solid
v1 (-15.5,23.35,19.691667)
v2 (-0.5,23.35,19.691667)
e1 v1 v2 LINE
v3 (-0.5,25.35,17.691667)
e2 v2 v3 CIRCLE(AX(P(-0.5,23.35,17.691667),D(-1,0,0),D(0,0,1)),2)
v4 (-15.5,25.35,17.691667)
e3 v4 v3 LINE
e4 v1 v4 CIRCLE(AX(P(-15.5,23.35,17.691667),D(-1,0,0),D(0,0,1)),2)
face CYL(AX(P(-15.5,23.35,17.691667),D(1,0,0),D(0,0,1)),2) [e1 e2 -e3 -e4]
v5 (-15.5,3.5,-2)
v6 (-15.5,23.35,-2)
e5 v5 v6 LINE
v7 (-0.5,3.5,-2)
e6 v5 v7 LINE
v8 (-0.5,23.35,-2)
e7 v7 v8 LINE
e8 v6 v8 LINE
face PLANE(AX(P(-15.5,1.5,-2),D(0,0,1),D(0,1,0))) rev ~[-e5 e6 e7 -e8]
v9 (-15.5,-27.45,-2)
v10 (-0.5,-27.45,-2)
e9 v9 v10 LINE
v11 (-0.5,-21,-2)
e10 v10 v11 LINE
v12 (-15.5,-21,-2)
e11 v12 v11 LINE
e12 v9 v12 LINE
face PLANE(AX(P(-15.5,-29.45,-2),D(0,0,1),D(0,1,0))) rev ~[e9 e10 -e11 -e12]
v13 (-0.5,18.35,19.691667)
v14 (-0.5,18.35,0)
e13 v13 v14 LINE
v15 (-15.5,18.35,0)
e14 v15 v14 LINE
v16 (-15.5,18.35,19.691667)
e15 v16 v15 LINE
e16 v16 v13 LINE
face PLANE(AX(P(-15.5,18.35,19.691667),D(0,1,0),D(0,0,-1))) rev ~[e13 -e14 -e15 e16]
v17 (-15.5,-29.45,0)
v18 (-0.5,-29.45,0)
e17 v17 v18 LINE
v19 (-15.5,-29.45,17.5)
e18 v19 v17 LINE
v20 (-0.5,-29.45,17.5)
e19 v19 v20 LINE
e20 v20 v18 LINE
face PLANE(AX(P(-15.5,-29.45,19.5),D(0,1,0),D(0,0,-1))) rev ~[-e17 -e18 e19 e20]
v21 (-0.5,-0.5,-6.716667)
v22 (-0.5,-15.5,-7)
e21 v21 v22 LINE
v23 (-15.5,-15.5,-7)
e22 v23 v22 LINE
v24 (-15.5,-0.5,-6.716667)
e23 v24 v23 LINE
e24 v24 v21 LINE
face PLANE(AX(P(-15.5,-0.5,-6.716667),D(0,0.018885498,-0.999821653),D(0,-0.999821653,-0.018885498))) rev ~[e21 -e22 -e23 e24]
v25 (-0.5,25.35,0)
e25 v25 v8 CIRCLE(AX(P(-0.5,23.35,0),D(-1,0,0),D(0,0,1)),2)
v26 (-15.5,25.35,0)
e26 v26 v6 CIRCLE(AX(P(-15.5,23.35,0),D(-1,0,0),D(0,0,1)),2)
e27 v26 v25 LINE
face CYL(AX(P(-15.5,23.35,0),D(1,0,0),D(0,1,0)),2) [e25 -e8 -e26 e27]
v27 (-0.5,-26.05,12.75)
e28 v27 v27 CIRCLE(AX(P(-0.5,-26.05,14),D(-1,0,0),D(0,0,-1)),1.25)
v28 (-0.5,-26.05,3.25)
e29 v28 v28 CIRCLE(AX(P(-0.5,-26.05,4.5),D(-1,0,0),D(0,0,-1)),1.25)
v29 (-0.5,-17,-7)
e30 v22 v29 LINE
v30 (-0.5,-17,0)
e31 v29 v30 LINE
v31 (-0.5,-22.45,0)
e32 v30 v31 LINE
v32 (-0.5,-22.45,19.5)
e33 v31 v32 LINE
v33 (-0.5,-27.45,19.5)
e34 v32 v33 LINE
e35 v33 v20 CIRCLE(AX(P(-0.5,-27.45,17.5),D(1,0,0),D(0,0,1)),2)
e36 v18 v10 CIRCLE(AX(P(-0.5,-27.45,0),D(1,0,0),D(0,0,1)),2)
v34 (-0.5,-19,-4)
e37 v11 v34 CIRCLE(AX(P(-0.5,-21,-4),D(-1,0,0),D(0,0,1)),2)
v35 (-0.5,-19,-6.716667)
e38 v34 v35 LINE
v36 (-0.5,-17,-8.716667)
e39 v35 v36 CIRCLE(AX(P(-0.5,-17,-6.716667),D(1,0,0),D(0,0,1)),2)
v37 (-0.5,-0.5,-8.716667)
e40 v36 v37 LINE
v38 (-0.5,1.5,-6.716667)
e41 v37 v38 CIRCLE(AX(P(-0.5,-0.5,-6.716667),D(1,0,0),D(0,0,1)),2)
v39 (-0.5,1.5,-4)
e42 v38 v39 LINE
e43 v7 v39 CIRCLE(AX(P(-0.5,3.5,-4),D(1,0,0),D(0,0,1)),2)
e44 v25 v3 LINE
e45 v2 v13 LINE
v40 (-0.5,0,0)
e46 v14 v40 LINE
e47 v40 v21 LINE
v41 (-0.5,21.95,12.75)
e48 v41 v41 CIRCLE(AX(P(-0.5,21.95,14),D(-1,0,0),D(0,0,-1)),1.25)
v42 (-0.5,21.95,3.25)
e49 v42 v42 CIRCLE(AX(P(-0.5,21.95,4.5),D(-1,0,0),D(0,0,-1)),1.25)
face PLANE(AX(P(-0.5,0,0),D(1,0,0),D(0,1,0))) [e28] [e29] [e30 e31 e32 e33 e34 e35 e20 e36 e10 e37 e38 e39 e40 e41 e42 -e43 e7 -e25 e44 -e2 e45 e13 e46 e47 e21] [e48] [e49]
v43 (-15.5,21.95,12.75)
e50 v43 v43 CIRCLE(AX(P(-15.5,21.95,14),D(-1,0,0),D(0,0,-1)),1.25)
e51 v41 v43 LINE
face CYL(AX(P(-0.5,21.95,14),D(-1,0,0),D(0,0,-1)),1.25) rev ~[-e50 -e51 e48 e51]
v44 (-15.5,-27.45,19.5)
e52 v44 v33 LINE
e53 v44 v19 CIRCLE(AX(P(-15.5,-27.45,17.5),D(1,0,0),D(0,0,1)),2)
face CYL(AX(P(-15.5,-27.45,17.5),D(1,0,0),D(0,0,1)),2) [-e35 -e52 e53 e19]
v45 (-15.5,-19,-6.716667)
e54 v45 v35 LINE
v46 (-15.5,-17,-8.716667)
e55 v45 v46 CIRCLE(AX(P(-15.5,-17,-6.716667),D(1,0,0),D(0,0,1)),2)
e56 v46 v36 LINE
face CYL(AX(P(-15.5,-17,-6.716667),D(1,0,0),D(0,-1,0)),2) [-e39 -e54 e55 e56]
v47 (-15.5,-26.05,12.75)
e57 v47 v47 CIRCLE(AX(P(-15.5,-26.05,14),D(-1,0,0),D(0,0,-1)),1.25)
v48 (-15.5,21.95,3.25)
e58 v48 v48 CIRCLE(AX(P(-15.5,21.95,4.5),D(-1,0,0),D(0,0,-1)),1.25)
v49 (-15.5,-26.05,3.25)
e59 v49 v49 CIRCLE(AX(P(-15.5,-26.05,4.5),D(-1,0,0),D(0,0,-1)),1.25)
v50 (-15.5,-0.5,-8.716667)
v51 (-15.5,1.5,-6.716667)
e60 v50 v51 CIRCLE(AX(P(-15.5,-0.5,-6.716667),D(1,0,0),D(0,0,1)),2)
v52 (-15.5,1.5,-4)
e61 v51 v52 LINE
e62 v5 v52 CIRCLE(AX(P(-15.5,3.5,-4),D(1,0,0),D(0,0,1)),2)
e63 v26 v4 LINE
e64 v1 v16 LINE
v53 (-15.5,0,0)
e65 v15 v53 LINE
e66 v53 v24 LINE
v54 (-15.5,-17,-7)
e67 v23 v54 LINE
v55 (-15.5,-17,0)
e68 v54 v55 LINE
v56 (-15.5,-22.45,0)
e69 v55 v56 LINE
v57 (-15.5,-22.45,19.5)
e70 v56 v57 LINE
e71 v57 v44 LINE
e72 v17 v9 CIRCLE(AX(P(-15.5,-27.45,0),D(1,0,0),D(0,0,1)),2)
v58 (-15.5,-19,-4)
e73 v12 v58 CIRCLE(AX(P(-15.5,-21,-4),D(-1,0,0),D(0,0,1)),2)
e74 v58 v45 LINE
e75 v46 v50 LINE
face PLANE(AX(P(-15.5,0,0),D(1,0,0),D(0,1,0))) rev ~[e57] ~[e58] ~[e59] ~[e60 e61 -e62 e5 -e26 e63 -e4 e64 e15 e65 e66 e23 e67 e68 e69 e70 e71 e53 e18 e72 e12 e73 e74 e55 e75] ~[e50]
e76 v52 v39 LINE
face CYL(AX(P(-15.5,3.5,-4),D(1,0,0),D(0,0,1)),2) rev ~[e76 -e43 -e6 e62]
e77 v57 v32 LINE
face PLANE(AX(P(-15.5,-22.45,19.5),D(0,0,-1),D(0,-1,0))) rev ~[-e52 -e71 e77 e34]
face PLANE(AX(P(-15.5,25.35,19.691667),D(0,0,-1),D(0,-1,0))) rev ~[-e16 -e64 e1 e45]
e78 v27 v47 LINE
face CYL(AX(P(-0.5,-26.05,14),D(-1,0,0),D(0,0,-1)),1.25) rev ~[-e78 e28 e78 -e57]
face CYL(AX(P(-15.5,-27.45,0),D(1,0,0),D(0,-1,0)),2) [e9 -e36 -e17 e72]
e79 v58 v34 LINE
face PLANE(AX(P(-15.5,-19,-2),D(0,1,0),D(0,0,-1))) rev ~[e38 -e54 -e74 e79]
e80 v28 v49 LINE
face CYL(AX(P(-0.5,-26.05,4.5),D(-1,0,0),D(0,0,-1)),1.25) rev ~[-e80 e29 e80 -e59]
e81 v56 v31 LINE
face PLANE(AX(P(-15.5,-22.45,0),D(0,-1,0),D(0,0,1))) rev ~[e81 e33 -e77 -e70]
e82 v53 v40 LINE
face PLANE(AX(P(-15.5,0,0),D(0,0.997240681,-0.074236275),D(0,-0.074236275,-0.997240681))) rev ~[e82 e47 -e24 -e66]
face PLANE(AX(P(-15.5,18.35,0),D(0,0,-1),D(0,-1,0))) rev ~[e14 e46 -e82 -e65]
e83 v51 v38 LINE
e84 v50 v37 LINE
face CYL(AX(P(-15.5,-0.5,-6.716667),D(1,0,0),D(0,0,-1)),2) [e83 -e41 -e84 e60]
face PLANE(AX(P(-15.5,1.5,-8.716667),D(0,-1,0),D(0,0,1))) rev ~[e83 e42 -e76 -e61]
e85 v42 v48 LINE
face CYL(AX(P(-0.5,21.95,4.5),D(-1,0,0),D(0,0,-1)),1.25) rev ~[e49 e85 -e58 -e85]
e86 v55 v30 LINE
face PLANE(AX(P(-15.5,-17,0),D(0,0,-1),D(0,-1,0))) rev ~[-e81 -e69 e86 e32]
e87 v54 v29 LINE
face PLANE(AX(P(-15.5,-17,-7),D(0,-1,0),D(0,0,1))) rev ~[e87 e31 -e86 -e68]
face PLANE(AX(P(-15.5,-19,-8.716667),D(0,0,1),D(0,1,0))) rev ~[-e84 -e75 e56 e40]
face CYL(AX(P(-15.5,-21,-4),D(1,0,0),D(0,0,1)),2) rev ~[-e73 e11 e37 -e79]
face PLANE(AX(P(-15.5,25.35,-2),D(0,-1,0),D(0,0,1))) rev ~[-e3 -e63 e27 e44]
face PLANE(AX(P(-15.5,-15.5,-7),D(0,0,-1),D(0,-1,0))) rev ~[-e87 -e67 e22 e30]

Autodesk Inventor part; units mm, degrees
ref_plane "XZ Plane" through (0, 0, 0) normal (0, 1, 0) x (-1, 0, 0)
ref_plane "XY Plane" through (0, 0, 0) normal (0, 0, 1) x (1, 0, 0)
ref_plane "Work Plane1" through (-15.5, 0, 0) normal (1, 0, 0) x (0, 1, 0)
sketch "Sketch1" plane through (-15.5, 0, 0) normal (1, 0, 0) x (0, 1, 0)
  line L0 (-0.5, 0) -> (-0.5, -6.716667)
  line L1 (-0.5, -6.716667) -> (-15.5, -6.716667)
  line L2 (-17, -7) -> (-15.5, -7)
  line L3 (-17, 0) -> (-17, -7)
  line L4 (-17, 0) -> (-22.45, 0)
  line L5 (-22.45, 0) -> (-22.45, 19.5)
  line L6 (-22.45, 19.5) -> (-29.45, 19.5)
  line L7 (-29.45, 19.5) -> (-29.45, -2)
  line L8 (-29.45, -2) -> (-19, -2)
  line L9 (-19, -2) -> (-19, -8.716667)
  line L10 (-19, -8.716667) -> (1.5, -8.716667)
  line L11 (-17, -7) -> (-0.5, -7) construction
  line L12 (-9.247706, -7) -> (-9.247706, -16.201099) construction
  line L13 (1.5, -8.716667) -> (1.5, -2)
  line L14 (1.5, -2) -> (25.35, -2)
  line L15 (25.35, -2) -> (25.35, 19.691667)
  line L16 (25.35, 19.691667) -> (18.35, 19.691667)
  line L17 (18.35, 19.691667) -> (18.35, 0)
  line L18 (18.35, 0) -> (0, 0)
  line L19 (-14.45, -1.808333) -> (-14.45, -5.115) construction
  dimension "d1" = 19.5
  dimension "d2" = 2
  dimension "d3" = 2
  dimension "d4" = 2
  dimension "d5" = 7
  dimension "d6" = 7
  dimension "d7" = 2
  dimension "d8" = 8
  dimension "d9" = 40.8
sketch "Sketch1 outline for Extrusion1" plane through (-15.5, 0, 0) normal (1, 0, 0) x (0, 1, 0)
  line L0 (-17, 0) -> (-22.45, 0)
  line L1 (-17, -7) -> (-17, 0)
  line L2 (-15.5, -7) -> (-17, -7)
  line L3 (-0.5, -6.716667) -> (-15.5, -7)
  line L4 (0, 0) -> (-0.5, -6.716667)
  line L5 (18.35, 0) -> (0, 0)
  line L6 (18.35, 19.691667) -> (18.35, 0)
  line L7 (25.35, 19.691667) -> (18.35, 19.691667)
  line L8 (25.35, -2) -> (25.35, 19.691667)
  line L9 (1.5, -2) -> (25.35, -2)
  line L10 (1.5, -8.716667) -> (1.5, -2)
  line L11 (-19, -8.716667) -> (1.5, -8.716667)
  line L12 (-19, -2) -> (-19, -8.716667)
  line L13 (-29.45, -2) -> (-19, -2)
  line L14 (-29.45, 19.5) -> (-29.45, -2)
  line L15 (-22.45, 19.5) -> (-29.45, 19.5)
  line L16 (-22.45, 0) -> (-22.45, 19.5)
extrude "Extrusion1" add sketch "Sketch1 outline for Extrusion1" along normal blind 15
sketch "Sketch2" plane through (-0.5, 0, 0) normal (1, 0, 0) x (0, 0, -1)
  line L0 (0, -17) -> (0, -22.45)
  line L1 (0, 18.35) -> (0, 0)
  line L2 (-19.5, -29.45) -> (2, -29.45)
  line L3 (2, 25.35) -> (-19.691667, 25.35)
  point P0 (-4.5, -26.05)
  point P1 (-14, -26.05)
  point P2 (-4.5, 21.95)
  point P3 (-14, 21.95)
  dimension "d12" = 4.5
  dimension "d13" = 9.5
  dimension "d14" = 4.5
  dimension "d15" = 9.5
  dimension "d16" = 48
  dimension "d17" = 3.4
  dimension "d18" = 3.4
hole "Hole1" at (-0.5, -26.05, 4.5) at (-0.5, -26.05, 14) at (-0.5, 21.95, 4.5) at (-0.5, 21.95, 14) direction (-1, 0, 0) diameter 2.5 end through all
fillet "Fillet1" radius 2 8 edges at (-8, 25.35, 19.6917) (-8, 25.35, -2) (-8, 1.5, -2) (-8, 1.5, -8.7167) (-8, -19, -8.7167) (-8, -29.45, -2) (-8, -29.45, 19.5) (-8, -19, -2)
equation "\"d2\" = d3"
equation "\"d4\" = d3"
equation "\"d7\" = d3"
equation "\"d14\" = d12"
equation "\"d15\" = d13"
equation "\"d18\" = d17"
properties part number "bracket"
